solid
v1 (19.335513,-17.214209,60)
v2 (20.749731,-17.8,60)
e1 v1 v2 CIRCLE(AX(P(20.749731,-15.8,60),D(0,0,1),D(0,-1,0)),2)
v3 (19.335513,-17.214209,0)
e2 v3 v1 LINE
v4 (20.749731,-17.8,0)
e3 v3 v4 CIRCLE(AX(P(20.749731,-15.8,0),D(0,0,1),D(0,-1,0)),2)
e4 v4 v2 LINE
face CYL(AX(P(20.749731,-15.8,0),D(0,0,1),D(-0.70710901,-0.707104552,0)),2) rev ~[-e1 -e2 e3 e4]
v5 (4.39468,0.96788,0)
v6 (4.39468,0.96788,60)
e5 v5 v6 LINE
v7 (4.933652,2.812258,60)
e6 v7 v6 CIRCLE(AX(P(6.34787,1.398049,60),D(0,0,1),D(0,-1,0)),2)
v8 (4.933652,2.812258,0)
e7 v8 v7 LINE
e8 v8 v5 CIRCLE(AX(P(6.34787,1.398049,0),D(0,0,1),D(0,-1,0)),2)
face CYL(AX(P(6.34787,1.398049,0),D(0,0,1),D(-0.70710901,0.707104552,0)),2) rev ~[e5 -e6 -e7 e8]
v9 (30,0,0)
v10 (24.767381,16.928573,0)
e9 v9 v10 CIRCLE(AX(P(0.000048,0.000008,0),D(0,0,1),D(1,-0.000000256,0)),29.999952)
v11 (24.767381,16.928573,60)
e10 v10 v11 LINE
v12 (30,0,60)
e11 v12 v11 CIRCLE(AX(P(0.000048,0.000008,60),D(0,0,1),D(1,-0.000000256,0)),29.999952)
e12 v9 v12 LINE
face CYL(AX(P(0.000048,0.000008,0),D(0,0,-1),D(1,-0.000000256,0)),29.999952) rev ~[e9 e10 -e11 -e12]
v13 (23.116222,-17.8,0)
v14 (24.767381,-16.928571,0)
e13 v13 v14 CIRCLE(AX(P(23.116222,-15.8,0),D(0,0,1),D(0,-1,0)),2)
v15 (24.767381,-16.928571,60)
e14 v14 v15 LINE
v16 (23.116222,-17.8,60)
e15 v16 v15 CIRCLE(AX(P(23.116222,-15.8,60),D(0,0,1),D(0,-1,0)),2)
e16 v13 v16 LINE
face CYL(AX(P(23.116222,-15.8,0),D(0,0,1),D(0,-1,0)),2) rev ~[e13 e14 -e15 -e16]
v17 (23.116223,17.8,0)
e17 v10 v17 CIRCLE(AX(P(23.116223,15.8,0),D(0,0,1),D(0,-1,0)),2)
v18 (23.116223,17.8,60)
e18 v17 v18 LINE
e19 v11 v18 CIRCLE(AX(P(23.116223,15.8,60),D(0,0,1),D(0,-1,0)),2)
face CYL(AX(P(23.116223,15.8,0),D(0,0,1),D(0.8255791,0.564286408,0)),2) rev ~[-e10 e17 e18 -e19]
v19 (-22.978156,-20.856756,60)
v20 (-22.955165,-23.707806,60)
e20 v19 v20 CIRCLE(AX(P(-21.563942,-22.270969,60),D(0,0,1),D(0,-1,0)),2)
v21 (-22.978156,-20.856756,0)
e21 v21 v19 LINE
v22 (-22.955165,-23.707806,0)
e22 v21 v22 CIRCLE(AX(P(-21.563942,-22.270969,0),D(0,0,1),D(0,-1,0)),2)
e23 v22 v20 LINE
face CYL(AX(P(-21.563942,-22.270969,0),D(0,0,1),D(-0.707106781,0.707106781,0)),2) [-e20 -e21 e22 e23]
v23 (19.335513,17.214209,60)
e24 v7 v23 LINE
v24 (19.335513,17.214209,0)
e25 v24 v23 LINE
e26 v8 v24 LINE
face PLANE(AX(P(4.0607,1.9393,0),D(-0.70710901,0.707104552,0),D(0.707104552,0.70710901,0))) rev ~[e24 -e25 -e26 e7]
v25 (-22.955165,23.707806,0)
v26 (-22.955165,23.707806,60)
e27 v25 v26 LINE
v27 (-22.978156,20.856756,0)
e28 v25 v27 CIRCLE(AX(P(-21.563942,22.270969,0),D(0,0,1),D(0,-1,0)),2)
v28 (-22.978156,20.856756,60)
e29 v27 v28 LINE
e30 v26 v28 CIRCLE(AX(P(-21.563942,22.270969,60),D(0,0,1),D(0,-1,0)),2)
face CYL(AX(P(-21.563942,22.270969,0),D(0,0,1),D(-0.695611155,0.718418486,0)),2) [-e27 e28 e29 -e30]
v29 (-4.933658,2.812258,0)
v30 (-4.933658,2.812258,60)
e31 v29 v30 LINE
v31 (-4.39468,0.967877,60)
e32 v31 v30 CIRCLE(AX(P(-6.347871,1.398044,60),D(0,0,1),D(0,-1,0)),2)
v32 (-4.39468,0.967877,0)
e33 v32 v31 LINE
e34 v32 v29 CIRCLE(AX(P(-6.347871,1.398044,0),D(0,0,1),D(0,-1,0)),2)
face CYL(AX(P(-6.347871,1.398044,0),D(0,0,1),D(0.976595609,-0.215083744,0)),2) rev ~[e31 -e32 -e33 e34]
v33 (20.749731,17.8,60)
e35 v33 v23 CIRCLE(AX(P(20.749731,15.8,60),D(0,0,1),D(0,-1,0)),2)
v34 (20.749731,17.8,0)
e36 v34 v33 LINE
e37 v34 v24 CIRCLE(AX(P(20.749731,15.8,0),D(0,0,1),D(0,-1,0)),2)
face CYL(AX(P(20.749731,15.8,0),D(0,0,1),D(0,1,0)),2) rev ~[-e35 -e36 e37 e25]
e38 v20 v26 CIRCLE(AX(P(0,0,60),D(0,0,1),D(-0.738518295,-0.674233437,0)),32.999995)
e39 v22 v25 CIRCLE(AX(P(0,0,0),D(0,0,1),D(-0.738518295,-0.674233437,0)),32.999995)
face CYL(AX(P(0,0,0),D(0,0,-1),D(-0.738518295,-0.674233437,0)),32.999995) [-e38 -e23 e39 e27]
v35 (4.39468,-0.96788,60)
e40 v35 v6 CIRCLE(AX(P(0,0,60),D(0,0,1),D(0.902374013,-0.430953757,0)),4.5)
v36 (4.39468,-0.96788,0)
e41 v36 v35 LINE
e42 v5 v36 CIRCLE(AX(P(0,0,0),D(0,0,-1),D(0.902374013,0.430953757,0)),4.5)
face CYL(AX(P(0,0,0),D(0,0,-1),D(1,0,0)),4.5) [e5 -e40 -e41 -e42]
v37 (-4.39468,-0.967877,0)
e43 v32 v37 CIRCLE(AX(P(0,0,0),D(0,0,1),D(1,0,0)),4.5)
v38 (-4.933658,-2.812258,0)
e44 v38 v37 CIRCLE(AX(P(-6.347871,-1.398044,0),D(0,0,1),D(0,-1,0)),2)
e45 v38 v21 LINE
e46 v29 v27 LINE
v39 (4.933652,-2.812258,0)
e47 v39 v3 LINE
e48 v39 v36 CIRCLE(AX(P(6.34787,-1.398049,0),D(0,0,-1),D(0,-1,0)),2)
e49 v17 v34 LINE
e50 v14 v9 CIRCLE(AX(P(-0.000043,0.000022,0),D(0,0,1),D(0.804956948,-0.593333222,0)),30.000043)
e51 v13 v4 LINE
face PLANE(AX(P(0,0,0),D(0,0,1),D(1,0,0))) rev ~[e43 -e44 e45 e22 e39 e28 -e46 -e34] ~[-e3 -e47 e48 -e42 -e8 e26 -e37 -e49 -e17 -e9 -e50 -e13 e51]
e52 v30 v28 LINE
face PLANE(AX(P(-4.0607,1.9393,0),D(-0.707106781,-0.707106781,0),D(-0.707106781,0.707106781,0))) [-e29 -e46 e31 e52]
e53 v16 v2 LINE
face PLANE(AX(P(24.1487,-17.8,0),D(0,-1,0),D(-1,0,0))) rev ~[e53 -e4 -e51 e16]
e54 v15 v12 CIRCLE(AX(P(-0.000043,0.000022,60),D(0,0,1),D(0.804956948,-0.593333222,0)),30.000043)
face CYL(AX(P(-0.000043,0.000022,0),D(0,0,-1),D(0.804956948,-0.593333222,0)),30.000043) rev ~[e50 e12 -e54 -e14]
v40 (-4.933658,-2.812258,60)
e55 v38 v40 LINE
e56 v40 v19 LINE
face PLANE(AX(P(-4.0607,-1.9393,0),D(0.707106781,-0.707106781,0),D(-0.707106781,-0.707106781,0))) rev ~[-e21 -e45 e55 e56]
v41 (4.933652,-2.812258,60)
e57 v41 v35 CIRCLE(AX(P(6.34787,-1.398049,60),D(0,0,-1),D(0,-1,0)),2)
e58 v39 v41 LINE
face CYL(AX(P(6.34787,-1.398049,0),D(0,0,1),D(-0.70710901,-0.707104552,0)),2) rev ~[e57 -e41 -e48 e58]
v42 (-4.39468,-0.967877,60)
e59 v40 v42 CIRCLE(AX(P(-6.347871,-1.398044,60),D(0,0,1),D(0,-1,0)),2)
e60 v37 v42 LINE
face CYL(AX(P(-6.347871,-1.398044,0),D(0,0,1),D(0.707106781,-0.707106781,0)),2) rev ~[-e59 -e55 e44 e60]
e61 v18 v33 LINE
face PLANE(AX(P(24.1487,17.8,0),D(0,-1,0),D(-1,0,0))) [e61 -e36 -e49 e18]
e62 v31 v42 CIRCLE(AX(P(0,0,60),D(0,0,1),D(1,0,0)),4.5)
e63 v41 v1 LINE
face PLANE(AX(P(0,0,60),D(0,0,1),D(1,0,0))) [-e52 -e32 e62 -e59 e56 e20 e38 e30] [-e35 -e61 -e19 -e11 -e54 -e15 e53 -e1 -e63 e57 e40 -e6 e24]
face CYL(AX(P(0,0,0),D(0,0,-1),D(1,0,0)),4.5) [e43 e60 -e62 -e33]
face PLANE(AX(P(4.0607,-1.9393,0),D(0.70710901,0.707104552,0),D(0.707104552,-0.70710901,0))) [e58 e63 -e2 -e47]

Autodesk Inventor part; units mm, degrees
ref_plane "YZ Plane" through (0, 0, 0) normal (1, 0, 0) x (0, 1, 0)
ref_plane "XZ Plane" through (0, 0, 0) normal (0, 1, 0) x (-1, 0, 0)
ref_plane "XY Plane" through (0, 0, 0) normal (0, 0, 1) x (1, 0, 0)
sketch "Sketch2" plane through (0, 0, 0) normal (0, 0, 1) x (1, 0, 0)
  arc A0 (20.126, -22.2473) -> (-20.126, -22.2473) centre (0, 0) ccw construction
  arc A1 (-24.3711, -22.2497) -> (-24.3711, 22.2497) centre (0, 0) ccw
  line L0 (32.9543, 32.9543) -> (23.3345, 23.3345) construction
  line L1 (-32.8174, 32.8174) -> (-23.3345, 23.3345) construction
  line L2 (23.3345, 23.3345) -> (-23.3345, -23.3345) construction
  line L3 (23.3345, -23.3345) -> (30.6779, -35.5804) construction
  line L4 (-23.3345, -23.3345) -> (-31.805, -34.2596) construction
  line L5 (-23.3345, 23.3345) -> (23.3345, -23.3345) construction
  line L6 (0, -33) -> (0, 33) construction
  line L7 (32.9543, 0) -> (-32.9543, 0) construction
  circle A2 centre (0, 0) radius 1.5
  circle A3 centre (0, 0) radius 4.5
  line L8 (4.0607, -1.9393) -> (22.2473, -20.126) construction
  line L9 (1.9393, -4.0607) -> (17.8, -19.9213) construction
  arc A4 (0, -30) -> (17.8, -24.1487) centre (0, 0) ccw construction
  line L10 (-1.9393, -4.0607) -> (-17.8, -19.9213) construction
  line L11 (-4.0607, -1.9393) -> (-22.2473, -20.126) construction
  line L12 (23.3345, 23.3345) -> (-23.3345, -23.3345) construction
  arc A5 (-20.126, -22.2473) -> (-17.8, -24.1487) centre (0, 0) ccw construction
  line L13 (17.8, -24.1487) -> (17.8, -19.9213) construction
  line L14 (-17.8, -24.1487) -> (-17.8, -19.9213) construction
  line L15 (17.8, -22.035) -> (-17.8, -22.035) construction
  arc A6 (-17.8, -24.1487) -> (0, -30) centre (0, 0) ccw construction
  line L16 (-17.8, -19.9213) -> (-20.126, -22.2473) construction
  line L17 (17.8, -19.9213) -> (20.126, -22.2473) construction
  arc A7 (17.8, -24.1487) -> (20.126, -22.2473) centre (0, 0) ccw construction
  line L18 (17.8, 19.9213) -> (20.126, 22.2473) construction
  arc A8 (20.126, 22.2473) -> (17.8, 24.1487) centre (0, 0) ccw construction
  arc A9 (-17.8, 24.1487) -> (-20.126, 22.2473) centre (0, 0) ccw construction
  line L19 (-17.8, 19.9213) -> (-20.126, 22.2473) construction
  line L20 (-1.9393, 4.0607) -> (-17.8, 19.9213) construction
  line L21 (1.9393, 4.0607) -> (17.8, 19.9213) construction
  line L22 (17.8, 24.1487) -> (17.8, 19.9213) construction
  arc A10 (17.8, 24.1487) -> (0, 30) centre (0, 0) ccw construction
  arc A11 (0, 30) -> (-17.8, 24.1487) centre (0, 0) ccw construction
  line L23 (-17.8, 24.1487) -> (-17.8, 19.9213) construction
  line L24 (4.0607, 1.9393) -> (22.2473, 20.126) construction
  line L25 (-4.0607, 1.9393) -> (-22.2473, 20.126) construction
  line L26 (-4.0607, 1.9393) -> (-24.3711, 22.2497)
  line L27 (-4.0607, -1.9393) -> (-24.3711, -22.2497)
  arc A12 (-24.3711, 22.2497) -> (-24.3711, -22.2497) centre (0, 0) ccw construction
  line L28 (24.1487, 17.8) -> (19.9213, 17.8)
  line L29 (4.0607, 1.9393) -> (19.9213, 17.8)
  arc A13 (30, 0) -> (24.1487, 17.8) centre (0, 0) ccw
  arc A14 (24.1487, -17.8) -> (30, 0) centre (0, 0) ccw
  line L30 (24.1487, -17.8) -> (19.9213, -17.8)
  line L31 (4.0607, -1.9393) -> (19.9213, -17.8)
  point P0 (0, -22.035)
  point P1 (22.035, 17.8)
  point P2 (22.035, -17.8)
  dimension "d32" = 60
  dimension "d33" = 3
  dimension "d34" = 3
  dimension "d35" = 3
  dimension "d36" = 1.5
  dimension "d37" = 3
  dimension "d38" = 35.6
  dimension "d43" = 45
  dimension "d47" = 90
extrude "Extrusion2" add sketch "Sketch2" along normal blind 60 contours L27 A3 L31 L30 A14 A13 L28 L29 L26 A1 | A3 | A2
fillet "Fillet2" radius 2 10 edges at (-24.3711, 22.2497, 30) (-24.3711, -22.2497, 30) (-4.0607, -1.9393, 30) (-4.0607, 1.9393, 30) (4.0607, -1.9393, 30) (4.0607, 1.9393, 30) (19.9213, -17.8, 30) (24.1487, -17.8, 30) (19.9213, 17.8, 30) (24.1487, 17.8, 30)
properties part number "Feeder Rotator" material "ABS Plastic"
